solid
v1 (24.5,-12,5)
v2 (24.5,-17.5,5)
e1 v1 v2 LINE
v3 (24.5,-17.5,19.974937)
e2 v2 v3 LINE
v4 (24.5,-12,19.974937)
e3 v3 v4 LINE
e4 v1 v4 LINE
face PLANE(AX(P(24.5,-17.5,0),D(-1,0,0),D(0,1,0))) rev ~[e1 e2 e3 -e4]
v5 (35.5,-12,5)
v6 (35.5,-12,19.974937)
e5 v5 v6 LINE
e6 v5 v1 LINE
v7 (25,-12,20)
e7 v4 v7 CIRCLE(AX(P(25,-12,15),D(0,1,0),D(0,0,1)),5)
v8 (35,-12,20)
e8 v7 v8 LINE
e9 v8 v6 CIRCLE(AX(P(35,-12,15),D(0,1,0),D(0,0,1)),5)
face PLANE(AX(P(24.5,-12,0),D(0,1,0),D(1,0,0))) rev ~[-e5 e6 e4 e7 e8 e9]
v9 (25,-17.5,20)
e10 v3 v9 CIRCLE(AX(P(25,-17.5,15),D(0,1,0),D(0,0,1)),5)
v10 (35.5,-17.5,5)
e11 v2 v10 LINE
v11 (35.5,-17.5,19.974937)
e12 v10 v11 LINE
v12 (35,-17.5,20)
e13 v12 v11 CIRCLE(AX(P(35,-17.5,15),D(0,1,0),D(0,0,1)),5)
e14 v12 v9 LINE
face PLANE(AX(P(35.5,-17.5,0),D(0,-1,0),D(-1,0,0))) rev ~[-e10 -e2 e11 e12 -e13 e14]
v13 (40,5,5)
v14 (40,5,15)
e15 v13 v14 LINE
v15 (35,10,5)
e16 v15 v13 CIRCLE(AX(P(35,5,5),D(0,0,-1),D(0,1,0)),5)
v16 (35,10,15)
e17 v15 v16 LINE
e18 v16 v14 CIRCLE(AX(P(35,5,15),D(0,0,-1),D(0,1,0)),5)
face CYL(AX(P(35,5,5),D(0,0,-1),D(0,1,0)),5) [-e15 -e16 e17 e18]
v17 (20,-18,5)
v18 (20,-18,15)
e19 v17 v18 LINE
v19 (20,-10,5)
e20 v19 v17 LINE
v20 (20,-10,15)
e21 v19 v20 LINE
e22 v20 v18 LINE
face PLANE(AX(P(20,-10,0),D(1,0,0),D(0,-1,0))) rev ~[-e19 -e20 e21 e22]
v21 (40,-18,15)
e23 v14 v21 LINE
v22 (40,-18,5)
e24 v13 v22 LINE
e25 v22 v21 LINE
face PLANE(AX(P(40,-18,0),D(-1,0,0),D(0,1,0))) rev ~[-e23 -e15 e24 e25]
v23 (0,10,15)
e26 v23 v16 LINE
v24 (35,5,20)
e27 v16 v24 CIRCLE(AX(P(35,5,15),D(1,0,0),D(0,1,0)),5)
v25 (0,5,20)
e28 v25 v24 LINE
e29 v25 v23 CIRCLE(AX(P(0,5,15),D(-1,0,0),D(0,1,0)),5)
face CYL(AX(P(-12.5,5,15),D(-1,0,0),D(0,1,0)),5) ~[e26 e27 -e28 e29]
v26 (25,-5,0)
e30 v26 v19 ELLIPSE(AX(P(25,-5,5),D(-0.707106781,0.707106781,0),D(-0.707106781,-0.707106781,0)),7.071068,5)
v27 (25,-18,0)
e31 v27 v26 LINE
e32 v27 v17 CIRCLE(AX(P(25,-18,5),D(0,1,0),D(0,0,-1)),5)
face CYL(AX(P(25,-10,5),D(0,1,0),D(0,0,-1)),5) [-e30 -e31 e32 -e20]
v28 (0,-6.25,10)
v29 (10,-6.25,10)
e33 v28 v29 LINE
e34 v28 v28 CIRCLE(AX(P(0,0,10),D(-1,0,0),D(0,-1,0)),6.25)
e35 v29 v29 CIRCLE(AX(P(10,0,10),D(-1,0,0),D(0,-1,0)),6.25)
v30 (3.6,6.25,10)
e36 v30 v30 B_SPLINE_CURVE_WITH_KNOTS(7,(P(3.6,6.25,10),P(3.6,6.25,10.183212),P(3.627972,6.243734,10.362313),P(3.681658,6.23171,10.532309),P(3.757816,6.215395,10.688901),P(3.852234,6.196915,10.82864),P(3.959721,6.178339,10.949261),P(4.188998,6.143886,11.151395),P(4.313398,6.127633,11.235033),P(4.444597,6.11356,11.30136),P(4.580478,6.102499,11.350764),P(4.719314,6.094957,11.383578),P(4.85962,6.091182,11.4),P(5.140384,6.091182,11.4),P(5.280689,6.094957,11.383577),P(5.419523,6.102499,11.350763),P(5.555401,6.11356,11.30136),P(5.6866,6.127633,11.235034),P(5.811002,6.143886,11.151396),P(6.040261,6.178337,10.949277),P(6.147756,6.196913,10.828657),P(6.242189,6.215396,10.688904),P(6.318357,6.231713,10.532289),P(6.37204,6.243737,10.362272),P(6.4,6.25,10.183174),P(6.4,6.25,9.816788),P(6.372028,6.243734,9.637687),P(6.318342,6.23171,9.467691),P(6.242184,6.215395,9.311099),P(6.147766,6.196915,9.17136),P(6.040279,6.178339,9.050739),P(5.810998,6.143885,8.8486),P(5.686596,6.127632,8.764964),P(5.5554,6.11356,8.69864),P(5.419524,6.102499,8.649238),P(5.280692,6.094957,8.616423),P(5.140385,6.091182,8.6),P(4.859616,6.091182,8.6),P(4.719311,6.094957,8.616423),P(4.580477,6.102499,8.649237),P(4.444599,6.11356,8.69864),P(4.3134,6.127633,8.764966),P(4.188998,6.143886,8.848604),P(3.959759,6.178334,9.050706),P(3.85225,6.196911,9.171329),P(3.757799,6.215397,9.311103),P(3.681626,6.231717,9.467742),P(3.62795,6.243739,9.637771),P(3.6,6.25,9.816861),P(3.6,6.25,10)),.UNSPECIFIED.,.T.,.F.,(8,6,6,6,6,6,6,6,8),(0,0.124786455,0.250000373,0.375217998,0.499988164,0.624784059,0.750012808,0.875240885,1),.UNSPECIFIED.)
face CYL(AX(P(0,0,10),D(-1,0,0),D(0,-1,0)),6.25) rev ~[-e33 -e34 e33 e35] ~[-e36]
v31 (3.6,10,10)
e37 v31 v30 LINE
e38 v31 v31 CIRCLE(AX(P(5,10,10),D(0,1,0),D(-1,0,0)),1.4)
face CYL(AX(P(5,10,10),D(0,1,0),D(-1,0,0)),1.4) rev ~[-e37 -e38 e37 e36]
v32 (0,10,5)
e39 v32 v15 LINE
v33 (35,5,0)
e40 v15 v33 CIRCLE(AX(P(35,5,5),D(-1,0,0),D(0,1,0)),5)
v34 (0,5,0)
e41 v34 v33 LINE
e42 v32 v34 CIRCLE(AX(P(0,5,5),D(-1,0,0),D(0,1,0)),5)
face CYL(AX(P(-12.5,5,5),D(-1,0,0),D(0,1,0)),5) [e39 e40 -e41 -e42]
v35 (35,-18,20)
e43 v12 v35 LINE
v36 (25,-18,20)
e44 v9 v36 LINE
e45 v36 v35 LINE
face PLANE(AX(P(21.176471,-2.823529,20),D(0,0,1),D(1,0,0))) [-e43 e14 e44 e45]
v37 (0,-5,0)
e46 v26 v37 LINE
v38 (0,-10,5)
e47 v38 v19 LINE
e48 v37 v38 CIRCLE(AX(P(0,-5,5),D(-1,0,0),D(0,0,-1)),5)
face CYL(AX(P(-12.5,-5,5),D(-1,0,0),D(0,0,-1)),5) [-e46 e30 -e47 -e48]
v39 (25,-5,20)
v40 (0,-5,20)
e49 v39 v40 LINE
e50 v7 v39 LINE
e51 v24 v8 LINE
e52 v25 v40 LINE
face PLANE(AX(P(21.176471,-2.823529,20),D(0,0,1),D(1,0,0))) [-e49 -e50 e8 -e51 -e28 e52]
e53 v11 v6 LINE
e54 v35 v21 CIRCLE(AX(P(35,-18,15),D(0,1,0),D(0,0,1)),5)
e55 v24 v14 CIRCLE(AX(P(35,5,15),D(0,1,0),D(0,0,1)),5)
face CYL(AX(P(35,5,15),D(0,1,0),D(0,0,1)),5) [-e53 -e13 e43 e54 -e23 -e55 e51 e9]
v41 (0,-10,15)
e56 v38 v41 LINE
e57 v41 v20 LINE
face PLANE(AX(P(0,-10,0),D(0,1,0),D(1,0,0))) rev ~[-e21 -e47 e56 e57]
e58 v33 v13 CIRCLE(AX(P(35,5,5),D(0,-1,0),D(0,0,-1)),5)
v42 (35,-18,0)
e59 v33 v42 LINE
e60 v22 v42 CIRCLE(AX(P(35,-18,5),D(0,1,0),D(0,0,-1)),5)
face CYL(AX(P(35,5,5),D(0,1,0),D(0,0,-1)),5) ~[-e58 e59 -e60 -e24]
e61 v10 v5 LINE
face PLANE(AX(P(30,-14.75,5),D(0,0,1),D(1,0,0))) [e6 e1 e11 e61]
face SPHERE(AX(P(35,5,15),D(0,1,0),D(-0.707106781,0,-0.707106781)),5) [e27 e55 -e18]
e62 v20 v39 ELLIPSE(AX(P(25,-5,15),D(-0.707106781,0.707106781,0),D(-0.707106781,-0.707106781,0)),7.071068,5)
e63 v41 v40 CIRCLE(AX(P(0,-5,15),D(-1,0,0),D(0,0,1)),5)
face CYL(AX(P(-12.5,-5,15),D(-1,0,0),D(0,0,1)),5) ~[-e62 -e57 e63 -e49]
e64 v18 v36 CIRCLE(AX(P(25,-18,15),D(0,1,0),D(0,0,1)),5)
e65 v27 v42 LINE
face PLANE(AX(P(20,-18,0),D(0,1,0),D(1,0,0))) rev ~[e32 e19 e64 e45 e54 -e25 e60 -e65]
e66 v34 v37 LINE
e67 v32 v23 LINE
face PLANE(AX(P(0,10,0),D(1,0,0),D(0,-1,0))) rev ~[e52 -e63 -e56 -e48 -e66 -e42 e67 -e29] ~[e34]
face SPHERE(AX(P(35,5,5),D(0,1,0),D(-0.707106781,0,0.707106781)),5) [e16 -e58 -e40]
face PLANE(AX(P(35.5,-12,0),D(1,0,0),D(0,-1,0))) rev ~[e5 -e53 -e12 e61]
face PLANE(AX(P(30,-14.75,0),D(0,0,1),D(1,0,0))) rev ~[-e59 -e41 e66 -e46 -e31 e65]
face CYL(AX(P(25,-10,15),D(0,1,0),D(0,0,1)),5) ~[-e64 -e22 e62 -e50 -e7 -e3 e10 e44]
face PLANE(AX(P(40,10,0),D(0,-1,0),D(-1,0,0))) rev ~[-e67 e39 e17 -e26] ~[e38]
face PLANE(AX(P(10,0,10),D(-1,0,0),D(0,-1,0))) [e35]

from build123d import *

# Parameters (mm, degrees)
F1_DEPTH     = 20
F2_DEPTH     = 5
F3_R         = 6.25
F4_DEPTH     = 10
F5_R         = 1.4
F6_DEPTH     = 3.9098179487
F7_T1_DEPTH  = 47.5
F7_T3_DEPTH  = 32.5
F7_T5_DEPTH  = 20.5
F7_T7_DEPTH  = 35.5
F7_T9_DEPTH  = 10
F7_S13_W     = 5
F7_S13_H     = 5
F7_T14_DEPTH = 5
F7_S19_W     = 5
F7_S19_H     = 5
F7_T20_DEPTH = 5
F7_T27_DEPTH = 45
F7_T31_DEPTH = 33
F7_T38_DEPTH = 45
F7_T42_DEPTH = 33


# Not quite as in the source:
# - a fillet or chamfer that OpenCascade refuses, or shapes differently, is made with other operations: its cross-section is extruded or revolved along the edge and cut away or added


with BuildPart() as f1:
    # F0 (on Top) → F1 (new body)
    with BuildSketch(Plane.XY):
        Polygon((0, 10), (0, 0), (0, -10), (20, -10), (20, -18), (40, -18), (40, 10), align=None)
        Polygon((35.5, -12), (35.5, -17.5), (30, -17.5), (24.5, -17.5), (24.5, -12), align=None, mode=Mode.SUBTRACT)
    extrude(amount=F1_DEPTH)

    # F0 (on Top) → F2 (join)
    with BuildSketch(Plane.XY):
        Polygon((30, -17.5), (35.5, -17.5), (35.5, -12), (24.5, -12), (24.5, -17.5), align=None)
    extrude(amount=F2_DEPTH)

    # F3 (on face) → F4 (cut)
    with BuildSketch(Plane(origin=(0, 0, 0), x_dir=(0, -1, 0), z_dir=(-1, 0, 0))):
        with Locations((0, 10)):
            Circle(F3_R)
    extrude(amount=-F4_DEPTH, mode=Mode.SUBTRACT)

    # F5 (on face) → F6 (cut, through all)
    with BuildSketch(Plane(origin=(0, 10, 0), x_dir=(-1, 0, 0), z_dir=(0, 1, 0))):
        with Locations((-5, 10)):
            Circle(F5_R)
    extrude(amount=-F6_DEPTH, mode=Mode.SUBTRACT)

    # F7: fillet of radius 5 on 9 edges, made by hand

    # F7_s2 → F7_t1 (cut)
    with BuildSketch(Plane.YZ.offset(-12.5)):
        with BuildLine():
            ThreePointArc((10, 15), (8.5355339059, 18.5355339059), (5, 20))
            Line((5, 20), (10, 20))
            Line((10, 20), (10, 15))
        make_face()
        with BuildLine():
            ThreePointArc((10, 5), (8.5355339059, 1.4644660941), (5, 0))
            Line((5, 0), (10, 0))
            Line((10, 0), (10, 5))
        make_face()
    extrude(amount=F7_T1_DEPTH, mode=Mode.SUBTRACT)

    # F7_s4 → F7_t3 (cut)
    with BuildSketch(Plane.YZ.offset(-12.5)):
        with BuildLine():
            ThreePointArc((-5, 20), (-8.5355339059, 18.5355339059), (-10, 15))
            Line((-10, 15), (-10, 20))
            Line((-10, 20), (-5, 20))
        make_face()
        with BuildLine():
            ThreePointArc((-5, 0), (-8.5355339059, 1.4644660941), (-10, 5))
            Line((-10, 5), (-10, 0))
            Line((-10, 0), (-5, 0))
        make_face()
    extrude(amount=F7_T3_DEPTH, mode=Mode.SUBTRACT)

    # F7_s6 → F7_t5 (cut)
    with BuildSketch(Plane.XZ.offset(10)):
        with BuildLine():
            ThreePointArc((25, 20), (21.4644660941, 18.5355339059), (20, 15))
            Line((20, 15), (20, 20))
            Line((20, 20), (25, 20))
        make_face()
        with BuildLine():
            ThreePointArc((25, 0), (21.4644660941, 1.4644660941), (20, 5))
            Line((20, 5), (20, 0))
            Line((20, 0), (25, 0))
        make_face()
    extrude(amount=F7_T5_DEPTH, mode=Mode.SUBTRACT)

    # F7_s8 → F7_t7 (cut)
    with BuildSketch(Plane.XZ.offset(-5)):
        with BuildLine():
            ThreePointArc((35, 20), (38.5355339059, 18.5355339059), (40, 15))
            Line((40, 15), (40, 20))
            Line((40, 20), (35, 20))
        make_face()
        with BuildLine():
            ThreePointArc((35, 0), (38.5355339059, 1.4644660941), (40, 5))
            Line((40, 5), (40, 0))
            Line((40, 0), (35, 0))
        make_face()
    extrude(amount=F7_T7_DEPTH, mode=Mode.SUBTRACT)

    # F7_s10 → F7_t9 (cut)
    with BuildSketch(Plane.XY.offset(5)):
        with BuildLine():
            ThreePointArc((35, 10), (38.5355339059, 8.5355339059), (40, 5))
            Line((40, 5), (40, 10))
            Line((40, 10), (35, 10))
        make_face()
    extrude(amount=F7_T9_DEPTH, mode=Mode.SUBTRACT)


with BuildPart() as f7_tool12:
    # F7_s13 → F7_t14 (new body)
    with BuildSketch(Plane.XZ.offset(-5)):
        with Locations((37.5, 17.5)):
            Rectangle(F7_S13_W, F7_S13_H)
    extrude(amount=-F7_T14_DEPTH)

    # F7_s15 → F7_t16 (revolve, cut)
    with BuildSketch(Plane(origin=(35, 5, 15), x_dir=(-0.7071067812, 0, -0.7071067812), z_dir=(0.7071067812, 0, -0.7071067812))):
        with BuildLine():
            ThreePointArc((0, -5), (5, 0), (0, 5))
            Line((0, 5), (0, -5))
        make_face()
    revolve(axis=Axis((35, 5, 15), (0, 1, 0)), mode=Mode.SUBTRACT)


with BuildPart() as f1_1:
    add(f1.part)

    # F7_t11: cut F7_tool12
    add(f7_tool12.part, mode=Mode.SUBTRACT)


with BuildPart() as f7_tool18:
    # F7_s19 → F7_t20 (new body)
    with BuildSketch(Plane.XZ.offset(-5)):
        with Locations((37.5, 2.5)):
            Rectangle(F7_S19_W, F7_S19_H)
    extrude(amount=-F7_T20_DEPTH)

    # F7_s21 → F7_t22 (revolve, cut)
    with BuildSketch(Plane(origin=(35, 5, 5), x_dir=(-0.7071067812, 0, 0.7071067812), z_dir=(-0.7071067812, 0, -0.7071067812))):
        with BuildLine():
            ThreePointArc((0, -5), (5, 0), (0, 5))
            Line((0, 5), (0, -5))
        make_face()
    revolve(axis=Axis((35, 5, 5), (0, 1, 0)), mode=Mode.SUBTRACT)


with BuildPart() as f1_2:
    add(f1_1.part)

    # F7_t17: cut F7_tool18
    add(f7_tool18.part, mode=Mode.SUBTRACT)


with BuildPart() as f7_tool25:
    # F7_s26 → F7_t27 (new body)
    with BuildSketch(Plane.YZ.offset(-12.5)):
        with BuildLine():
            ThreePointArc((-5, 20), (-8.5355339059, 18.5355339059), (-10, 15))
            Line((-10, 15), (-10, 20))
            Line((-10, 20), (-5, 20))
        make_face()
    extrude(amount=F7_T27_DEPTH)

    split(bisect_by=Plane.YZ.offset(20), keep=Keep.TOP)


with BuildPart() as f7_tool29:
    # F7_s30 → F7_t31 (new body)
    with BuildSketch(Plane.XZ.offset(-2.5)):
        with BuildLine():
            ThreePointArc((25, 20), (21.4644660941, 18.5355339059), (20, 15))
            Line((20, 15), (20, 20))
            Line((20, 20), (25, 20))
        make_face()
    extrude(amount=F7_T31_DEPTH)

    split(bisect_by=Plane.XZ.offset(10), keep=Keep.BOTTOM)


with BuildPart() as f7_tool25_1:
    add(f7_tool25.part)

    # F7_t33: intersect F7_tool29
    add(f7_tool29.part, mode=Mode.INTERSECT)


with BuildPart() as f1_3:
    add(f1_2.part)

    # F7_t23: cut F7_tool25
    add(f7_tool25_1.part, mode=Mode.SUBTRACT)


with BuildPart() as f7_tool36:
    # F7_s37 → F7_t38 (new body)
    with BuildSketch(Plane.YZ.offset(-12.5)):
        with BuildLine():
            ThreePointArc((-5, 0), (-8.5355339059, 1.4644660941), (-10, 5))
            Line((-10, 5), (-10, 0))
            Line((-10, 0), (-5, 0))
        make_face()
    extrude(amount=F7_T38_DEPTH)

    split(bisect_by=Plane.YZ.offset(20), keep=Keep.TOP)


with BuildPart() as f7_tool40:
    # F7_s41 → F7_t42 (new body)
    with BuildSketch(Plane.XZ.offset(-2.5)):
        with BuildLine():
            ThreePointArc((25, 0), (21.4644660941, 1.4644660941), (20, 5))
            Line((20, 5), (20, 0))
            Line((20, 0), (25, 0))
        make_face()
    extrude(amount=F7_T42_DEPTH)

    split(bisect_by=Plane.XZ.offset(10), keep=Keep.BOTTOM)


with BuildPart() as f7_tool36_1:
    add(f7_tool36.part)

    # F7_t44: intersect F7_tool40
    add(f7_tool40.part, mode=Mode.INTERSECT)


with BuildPart() as f1_4:
    add(f1_3.part)

    # F7_t34: cut F7_tool36
    add(f7_tool36_1.part, mode=Mode.SUBTRACT)


solid = f1_4.part
